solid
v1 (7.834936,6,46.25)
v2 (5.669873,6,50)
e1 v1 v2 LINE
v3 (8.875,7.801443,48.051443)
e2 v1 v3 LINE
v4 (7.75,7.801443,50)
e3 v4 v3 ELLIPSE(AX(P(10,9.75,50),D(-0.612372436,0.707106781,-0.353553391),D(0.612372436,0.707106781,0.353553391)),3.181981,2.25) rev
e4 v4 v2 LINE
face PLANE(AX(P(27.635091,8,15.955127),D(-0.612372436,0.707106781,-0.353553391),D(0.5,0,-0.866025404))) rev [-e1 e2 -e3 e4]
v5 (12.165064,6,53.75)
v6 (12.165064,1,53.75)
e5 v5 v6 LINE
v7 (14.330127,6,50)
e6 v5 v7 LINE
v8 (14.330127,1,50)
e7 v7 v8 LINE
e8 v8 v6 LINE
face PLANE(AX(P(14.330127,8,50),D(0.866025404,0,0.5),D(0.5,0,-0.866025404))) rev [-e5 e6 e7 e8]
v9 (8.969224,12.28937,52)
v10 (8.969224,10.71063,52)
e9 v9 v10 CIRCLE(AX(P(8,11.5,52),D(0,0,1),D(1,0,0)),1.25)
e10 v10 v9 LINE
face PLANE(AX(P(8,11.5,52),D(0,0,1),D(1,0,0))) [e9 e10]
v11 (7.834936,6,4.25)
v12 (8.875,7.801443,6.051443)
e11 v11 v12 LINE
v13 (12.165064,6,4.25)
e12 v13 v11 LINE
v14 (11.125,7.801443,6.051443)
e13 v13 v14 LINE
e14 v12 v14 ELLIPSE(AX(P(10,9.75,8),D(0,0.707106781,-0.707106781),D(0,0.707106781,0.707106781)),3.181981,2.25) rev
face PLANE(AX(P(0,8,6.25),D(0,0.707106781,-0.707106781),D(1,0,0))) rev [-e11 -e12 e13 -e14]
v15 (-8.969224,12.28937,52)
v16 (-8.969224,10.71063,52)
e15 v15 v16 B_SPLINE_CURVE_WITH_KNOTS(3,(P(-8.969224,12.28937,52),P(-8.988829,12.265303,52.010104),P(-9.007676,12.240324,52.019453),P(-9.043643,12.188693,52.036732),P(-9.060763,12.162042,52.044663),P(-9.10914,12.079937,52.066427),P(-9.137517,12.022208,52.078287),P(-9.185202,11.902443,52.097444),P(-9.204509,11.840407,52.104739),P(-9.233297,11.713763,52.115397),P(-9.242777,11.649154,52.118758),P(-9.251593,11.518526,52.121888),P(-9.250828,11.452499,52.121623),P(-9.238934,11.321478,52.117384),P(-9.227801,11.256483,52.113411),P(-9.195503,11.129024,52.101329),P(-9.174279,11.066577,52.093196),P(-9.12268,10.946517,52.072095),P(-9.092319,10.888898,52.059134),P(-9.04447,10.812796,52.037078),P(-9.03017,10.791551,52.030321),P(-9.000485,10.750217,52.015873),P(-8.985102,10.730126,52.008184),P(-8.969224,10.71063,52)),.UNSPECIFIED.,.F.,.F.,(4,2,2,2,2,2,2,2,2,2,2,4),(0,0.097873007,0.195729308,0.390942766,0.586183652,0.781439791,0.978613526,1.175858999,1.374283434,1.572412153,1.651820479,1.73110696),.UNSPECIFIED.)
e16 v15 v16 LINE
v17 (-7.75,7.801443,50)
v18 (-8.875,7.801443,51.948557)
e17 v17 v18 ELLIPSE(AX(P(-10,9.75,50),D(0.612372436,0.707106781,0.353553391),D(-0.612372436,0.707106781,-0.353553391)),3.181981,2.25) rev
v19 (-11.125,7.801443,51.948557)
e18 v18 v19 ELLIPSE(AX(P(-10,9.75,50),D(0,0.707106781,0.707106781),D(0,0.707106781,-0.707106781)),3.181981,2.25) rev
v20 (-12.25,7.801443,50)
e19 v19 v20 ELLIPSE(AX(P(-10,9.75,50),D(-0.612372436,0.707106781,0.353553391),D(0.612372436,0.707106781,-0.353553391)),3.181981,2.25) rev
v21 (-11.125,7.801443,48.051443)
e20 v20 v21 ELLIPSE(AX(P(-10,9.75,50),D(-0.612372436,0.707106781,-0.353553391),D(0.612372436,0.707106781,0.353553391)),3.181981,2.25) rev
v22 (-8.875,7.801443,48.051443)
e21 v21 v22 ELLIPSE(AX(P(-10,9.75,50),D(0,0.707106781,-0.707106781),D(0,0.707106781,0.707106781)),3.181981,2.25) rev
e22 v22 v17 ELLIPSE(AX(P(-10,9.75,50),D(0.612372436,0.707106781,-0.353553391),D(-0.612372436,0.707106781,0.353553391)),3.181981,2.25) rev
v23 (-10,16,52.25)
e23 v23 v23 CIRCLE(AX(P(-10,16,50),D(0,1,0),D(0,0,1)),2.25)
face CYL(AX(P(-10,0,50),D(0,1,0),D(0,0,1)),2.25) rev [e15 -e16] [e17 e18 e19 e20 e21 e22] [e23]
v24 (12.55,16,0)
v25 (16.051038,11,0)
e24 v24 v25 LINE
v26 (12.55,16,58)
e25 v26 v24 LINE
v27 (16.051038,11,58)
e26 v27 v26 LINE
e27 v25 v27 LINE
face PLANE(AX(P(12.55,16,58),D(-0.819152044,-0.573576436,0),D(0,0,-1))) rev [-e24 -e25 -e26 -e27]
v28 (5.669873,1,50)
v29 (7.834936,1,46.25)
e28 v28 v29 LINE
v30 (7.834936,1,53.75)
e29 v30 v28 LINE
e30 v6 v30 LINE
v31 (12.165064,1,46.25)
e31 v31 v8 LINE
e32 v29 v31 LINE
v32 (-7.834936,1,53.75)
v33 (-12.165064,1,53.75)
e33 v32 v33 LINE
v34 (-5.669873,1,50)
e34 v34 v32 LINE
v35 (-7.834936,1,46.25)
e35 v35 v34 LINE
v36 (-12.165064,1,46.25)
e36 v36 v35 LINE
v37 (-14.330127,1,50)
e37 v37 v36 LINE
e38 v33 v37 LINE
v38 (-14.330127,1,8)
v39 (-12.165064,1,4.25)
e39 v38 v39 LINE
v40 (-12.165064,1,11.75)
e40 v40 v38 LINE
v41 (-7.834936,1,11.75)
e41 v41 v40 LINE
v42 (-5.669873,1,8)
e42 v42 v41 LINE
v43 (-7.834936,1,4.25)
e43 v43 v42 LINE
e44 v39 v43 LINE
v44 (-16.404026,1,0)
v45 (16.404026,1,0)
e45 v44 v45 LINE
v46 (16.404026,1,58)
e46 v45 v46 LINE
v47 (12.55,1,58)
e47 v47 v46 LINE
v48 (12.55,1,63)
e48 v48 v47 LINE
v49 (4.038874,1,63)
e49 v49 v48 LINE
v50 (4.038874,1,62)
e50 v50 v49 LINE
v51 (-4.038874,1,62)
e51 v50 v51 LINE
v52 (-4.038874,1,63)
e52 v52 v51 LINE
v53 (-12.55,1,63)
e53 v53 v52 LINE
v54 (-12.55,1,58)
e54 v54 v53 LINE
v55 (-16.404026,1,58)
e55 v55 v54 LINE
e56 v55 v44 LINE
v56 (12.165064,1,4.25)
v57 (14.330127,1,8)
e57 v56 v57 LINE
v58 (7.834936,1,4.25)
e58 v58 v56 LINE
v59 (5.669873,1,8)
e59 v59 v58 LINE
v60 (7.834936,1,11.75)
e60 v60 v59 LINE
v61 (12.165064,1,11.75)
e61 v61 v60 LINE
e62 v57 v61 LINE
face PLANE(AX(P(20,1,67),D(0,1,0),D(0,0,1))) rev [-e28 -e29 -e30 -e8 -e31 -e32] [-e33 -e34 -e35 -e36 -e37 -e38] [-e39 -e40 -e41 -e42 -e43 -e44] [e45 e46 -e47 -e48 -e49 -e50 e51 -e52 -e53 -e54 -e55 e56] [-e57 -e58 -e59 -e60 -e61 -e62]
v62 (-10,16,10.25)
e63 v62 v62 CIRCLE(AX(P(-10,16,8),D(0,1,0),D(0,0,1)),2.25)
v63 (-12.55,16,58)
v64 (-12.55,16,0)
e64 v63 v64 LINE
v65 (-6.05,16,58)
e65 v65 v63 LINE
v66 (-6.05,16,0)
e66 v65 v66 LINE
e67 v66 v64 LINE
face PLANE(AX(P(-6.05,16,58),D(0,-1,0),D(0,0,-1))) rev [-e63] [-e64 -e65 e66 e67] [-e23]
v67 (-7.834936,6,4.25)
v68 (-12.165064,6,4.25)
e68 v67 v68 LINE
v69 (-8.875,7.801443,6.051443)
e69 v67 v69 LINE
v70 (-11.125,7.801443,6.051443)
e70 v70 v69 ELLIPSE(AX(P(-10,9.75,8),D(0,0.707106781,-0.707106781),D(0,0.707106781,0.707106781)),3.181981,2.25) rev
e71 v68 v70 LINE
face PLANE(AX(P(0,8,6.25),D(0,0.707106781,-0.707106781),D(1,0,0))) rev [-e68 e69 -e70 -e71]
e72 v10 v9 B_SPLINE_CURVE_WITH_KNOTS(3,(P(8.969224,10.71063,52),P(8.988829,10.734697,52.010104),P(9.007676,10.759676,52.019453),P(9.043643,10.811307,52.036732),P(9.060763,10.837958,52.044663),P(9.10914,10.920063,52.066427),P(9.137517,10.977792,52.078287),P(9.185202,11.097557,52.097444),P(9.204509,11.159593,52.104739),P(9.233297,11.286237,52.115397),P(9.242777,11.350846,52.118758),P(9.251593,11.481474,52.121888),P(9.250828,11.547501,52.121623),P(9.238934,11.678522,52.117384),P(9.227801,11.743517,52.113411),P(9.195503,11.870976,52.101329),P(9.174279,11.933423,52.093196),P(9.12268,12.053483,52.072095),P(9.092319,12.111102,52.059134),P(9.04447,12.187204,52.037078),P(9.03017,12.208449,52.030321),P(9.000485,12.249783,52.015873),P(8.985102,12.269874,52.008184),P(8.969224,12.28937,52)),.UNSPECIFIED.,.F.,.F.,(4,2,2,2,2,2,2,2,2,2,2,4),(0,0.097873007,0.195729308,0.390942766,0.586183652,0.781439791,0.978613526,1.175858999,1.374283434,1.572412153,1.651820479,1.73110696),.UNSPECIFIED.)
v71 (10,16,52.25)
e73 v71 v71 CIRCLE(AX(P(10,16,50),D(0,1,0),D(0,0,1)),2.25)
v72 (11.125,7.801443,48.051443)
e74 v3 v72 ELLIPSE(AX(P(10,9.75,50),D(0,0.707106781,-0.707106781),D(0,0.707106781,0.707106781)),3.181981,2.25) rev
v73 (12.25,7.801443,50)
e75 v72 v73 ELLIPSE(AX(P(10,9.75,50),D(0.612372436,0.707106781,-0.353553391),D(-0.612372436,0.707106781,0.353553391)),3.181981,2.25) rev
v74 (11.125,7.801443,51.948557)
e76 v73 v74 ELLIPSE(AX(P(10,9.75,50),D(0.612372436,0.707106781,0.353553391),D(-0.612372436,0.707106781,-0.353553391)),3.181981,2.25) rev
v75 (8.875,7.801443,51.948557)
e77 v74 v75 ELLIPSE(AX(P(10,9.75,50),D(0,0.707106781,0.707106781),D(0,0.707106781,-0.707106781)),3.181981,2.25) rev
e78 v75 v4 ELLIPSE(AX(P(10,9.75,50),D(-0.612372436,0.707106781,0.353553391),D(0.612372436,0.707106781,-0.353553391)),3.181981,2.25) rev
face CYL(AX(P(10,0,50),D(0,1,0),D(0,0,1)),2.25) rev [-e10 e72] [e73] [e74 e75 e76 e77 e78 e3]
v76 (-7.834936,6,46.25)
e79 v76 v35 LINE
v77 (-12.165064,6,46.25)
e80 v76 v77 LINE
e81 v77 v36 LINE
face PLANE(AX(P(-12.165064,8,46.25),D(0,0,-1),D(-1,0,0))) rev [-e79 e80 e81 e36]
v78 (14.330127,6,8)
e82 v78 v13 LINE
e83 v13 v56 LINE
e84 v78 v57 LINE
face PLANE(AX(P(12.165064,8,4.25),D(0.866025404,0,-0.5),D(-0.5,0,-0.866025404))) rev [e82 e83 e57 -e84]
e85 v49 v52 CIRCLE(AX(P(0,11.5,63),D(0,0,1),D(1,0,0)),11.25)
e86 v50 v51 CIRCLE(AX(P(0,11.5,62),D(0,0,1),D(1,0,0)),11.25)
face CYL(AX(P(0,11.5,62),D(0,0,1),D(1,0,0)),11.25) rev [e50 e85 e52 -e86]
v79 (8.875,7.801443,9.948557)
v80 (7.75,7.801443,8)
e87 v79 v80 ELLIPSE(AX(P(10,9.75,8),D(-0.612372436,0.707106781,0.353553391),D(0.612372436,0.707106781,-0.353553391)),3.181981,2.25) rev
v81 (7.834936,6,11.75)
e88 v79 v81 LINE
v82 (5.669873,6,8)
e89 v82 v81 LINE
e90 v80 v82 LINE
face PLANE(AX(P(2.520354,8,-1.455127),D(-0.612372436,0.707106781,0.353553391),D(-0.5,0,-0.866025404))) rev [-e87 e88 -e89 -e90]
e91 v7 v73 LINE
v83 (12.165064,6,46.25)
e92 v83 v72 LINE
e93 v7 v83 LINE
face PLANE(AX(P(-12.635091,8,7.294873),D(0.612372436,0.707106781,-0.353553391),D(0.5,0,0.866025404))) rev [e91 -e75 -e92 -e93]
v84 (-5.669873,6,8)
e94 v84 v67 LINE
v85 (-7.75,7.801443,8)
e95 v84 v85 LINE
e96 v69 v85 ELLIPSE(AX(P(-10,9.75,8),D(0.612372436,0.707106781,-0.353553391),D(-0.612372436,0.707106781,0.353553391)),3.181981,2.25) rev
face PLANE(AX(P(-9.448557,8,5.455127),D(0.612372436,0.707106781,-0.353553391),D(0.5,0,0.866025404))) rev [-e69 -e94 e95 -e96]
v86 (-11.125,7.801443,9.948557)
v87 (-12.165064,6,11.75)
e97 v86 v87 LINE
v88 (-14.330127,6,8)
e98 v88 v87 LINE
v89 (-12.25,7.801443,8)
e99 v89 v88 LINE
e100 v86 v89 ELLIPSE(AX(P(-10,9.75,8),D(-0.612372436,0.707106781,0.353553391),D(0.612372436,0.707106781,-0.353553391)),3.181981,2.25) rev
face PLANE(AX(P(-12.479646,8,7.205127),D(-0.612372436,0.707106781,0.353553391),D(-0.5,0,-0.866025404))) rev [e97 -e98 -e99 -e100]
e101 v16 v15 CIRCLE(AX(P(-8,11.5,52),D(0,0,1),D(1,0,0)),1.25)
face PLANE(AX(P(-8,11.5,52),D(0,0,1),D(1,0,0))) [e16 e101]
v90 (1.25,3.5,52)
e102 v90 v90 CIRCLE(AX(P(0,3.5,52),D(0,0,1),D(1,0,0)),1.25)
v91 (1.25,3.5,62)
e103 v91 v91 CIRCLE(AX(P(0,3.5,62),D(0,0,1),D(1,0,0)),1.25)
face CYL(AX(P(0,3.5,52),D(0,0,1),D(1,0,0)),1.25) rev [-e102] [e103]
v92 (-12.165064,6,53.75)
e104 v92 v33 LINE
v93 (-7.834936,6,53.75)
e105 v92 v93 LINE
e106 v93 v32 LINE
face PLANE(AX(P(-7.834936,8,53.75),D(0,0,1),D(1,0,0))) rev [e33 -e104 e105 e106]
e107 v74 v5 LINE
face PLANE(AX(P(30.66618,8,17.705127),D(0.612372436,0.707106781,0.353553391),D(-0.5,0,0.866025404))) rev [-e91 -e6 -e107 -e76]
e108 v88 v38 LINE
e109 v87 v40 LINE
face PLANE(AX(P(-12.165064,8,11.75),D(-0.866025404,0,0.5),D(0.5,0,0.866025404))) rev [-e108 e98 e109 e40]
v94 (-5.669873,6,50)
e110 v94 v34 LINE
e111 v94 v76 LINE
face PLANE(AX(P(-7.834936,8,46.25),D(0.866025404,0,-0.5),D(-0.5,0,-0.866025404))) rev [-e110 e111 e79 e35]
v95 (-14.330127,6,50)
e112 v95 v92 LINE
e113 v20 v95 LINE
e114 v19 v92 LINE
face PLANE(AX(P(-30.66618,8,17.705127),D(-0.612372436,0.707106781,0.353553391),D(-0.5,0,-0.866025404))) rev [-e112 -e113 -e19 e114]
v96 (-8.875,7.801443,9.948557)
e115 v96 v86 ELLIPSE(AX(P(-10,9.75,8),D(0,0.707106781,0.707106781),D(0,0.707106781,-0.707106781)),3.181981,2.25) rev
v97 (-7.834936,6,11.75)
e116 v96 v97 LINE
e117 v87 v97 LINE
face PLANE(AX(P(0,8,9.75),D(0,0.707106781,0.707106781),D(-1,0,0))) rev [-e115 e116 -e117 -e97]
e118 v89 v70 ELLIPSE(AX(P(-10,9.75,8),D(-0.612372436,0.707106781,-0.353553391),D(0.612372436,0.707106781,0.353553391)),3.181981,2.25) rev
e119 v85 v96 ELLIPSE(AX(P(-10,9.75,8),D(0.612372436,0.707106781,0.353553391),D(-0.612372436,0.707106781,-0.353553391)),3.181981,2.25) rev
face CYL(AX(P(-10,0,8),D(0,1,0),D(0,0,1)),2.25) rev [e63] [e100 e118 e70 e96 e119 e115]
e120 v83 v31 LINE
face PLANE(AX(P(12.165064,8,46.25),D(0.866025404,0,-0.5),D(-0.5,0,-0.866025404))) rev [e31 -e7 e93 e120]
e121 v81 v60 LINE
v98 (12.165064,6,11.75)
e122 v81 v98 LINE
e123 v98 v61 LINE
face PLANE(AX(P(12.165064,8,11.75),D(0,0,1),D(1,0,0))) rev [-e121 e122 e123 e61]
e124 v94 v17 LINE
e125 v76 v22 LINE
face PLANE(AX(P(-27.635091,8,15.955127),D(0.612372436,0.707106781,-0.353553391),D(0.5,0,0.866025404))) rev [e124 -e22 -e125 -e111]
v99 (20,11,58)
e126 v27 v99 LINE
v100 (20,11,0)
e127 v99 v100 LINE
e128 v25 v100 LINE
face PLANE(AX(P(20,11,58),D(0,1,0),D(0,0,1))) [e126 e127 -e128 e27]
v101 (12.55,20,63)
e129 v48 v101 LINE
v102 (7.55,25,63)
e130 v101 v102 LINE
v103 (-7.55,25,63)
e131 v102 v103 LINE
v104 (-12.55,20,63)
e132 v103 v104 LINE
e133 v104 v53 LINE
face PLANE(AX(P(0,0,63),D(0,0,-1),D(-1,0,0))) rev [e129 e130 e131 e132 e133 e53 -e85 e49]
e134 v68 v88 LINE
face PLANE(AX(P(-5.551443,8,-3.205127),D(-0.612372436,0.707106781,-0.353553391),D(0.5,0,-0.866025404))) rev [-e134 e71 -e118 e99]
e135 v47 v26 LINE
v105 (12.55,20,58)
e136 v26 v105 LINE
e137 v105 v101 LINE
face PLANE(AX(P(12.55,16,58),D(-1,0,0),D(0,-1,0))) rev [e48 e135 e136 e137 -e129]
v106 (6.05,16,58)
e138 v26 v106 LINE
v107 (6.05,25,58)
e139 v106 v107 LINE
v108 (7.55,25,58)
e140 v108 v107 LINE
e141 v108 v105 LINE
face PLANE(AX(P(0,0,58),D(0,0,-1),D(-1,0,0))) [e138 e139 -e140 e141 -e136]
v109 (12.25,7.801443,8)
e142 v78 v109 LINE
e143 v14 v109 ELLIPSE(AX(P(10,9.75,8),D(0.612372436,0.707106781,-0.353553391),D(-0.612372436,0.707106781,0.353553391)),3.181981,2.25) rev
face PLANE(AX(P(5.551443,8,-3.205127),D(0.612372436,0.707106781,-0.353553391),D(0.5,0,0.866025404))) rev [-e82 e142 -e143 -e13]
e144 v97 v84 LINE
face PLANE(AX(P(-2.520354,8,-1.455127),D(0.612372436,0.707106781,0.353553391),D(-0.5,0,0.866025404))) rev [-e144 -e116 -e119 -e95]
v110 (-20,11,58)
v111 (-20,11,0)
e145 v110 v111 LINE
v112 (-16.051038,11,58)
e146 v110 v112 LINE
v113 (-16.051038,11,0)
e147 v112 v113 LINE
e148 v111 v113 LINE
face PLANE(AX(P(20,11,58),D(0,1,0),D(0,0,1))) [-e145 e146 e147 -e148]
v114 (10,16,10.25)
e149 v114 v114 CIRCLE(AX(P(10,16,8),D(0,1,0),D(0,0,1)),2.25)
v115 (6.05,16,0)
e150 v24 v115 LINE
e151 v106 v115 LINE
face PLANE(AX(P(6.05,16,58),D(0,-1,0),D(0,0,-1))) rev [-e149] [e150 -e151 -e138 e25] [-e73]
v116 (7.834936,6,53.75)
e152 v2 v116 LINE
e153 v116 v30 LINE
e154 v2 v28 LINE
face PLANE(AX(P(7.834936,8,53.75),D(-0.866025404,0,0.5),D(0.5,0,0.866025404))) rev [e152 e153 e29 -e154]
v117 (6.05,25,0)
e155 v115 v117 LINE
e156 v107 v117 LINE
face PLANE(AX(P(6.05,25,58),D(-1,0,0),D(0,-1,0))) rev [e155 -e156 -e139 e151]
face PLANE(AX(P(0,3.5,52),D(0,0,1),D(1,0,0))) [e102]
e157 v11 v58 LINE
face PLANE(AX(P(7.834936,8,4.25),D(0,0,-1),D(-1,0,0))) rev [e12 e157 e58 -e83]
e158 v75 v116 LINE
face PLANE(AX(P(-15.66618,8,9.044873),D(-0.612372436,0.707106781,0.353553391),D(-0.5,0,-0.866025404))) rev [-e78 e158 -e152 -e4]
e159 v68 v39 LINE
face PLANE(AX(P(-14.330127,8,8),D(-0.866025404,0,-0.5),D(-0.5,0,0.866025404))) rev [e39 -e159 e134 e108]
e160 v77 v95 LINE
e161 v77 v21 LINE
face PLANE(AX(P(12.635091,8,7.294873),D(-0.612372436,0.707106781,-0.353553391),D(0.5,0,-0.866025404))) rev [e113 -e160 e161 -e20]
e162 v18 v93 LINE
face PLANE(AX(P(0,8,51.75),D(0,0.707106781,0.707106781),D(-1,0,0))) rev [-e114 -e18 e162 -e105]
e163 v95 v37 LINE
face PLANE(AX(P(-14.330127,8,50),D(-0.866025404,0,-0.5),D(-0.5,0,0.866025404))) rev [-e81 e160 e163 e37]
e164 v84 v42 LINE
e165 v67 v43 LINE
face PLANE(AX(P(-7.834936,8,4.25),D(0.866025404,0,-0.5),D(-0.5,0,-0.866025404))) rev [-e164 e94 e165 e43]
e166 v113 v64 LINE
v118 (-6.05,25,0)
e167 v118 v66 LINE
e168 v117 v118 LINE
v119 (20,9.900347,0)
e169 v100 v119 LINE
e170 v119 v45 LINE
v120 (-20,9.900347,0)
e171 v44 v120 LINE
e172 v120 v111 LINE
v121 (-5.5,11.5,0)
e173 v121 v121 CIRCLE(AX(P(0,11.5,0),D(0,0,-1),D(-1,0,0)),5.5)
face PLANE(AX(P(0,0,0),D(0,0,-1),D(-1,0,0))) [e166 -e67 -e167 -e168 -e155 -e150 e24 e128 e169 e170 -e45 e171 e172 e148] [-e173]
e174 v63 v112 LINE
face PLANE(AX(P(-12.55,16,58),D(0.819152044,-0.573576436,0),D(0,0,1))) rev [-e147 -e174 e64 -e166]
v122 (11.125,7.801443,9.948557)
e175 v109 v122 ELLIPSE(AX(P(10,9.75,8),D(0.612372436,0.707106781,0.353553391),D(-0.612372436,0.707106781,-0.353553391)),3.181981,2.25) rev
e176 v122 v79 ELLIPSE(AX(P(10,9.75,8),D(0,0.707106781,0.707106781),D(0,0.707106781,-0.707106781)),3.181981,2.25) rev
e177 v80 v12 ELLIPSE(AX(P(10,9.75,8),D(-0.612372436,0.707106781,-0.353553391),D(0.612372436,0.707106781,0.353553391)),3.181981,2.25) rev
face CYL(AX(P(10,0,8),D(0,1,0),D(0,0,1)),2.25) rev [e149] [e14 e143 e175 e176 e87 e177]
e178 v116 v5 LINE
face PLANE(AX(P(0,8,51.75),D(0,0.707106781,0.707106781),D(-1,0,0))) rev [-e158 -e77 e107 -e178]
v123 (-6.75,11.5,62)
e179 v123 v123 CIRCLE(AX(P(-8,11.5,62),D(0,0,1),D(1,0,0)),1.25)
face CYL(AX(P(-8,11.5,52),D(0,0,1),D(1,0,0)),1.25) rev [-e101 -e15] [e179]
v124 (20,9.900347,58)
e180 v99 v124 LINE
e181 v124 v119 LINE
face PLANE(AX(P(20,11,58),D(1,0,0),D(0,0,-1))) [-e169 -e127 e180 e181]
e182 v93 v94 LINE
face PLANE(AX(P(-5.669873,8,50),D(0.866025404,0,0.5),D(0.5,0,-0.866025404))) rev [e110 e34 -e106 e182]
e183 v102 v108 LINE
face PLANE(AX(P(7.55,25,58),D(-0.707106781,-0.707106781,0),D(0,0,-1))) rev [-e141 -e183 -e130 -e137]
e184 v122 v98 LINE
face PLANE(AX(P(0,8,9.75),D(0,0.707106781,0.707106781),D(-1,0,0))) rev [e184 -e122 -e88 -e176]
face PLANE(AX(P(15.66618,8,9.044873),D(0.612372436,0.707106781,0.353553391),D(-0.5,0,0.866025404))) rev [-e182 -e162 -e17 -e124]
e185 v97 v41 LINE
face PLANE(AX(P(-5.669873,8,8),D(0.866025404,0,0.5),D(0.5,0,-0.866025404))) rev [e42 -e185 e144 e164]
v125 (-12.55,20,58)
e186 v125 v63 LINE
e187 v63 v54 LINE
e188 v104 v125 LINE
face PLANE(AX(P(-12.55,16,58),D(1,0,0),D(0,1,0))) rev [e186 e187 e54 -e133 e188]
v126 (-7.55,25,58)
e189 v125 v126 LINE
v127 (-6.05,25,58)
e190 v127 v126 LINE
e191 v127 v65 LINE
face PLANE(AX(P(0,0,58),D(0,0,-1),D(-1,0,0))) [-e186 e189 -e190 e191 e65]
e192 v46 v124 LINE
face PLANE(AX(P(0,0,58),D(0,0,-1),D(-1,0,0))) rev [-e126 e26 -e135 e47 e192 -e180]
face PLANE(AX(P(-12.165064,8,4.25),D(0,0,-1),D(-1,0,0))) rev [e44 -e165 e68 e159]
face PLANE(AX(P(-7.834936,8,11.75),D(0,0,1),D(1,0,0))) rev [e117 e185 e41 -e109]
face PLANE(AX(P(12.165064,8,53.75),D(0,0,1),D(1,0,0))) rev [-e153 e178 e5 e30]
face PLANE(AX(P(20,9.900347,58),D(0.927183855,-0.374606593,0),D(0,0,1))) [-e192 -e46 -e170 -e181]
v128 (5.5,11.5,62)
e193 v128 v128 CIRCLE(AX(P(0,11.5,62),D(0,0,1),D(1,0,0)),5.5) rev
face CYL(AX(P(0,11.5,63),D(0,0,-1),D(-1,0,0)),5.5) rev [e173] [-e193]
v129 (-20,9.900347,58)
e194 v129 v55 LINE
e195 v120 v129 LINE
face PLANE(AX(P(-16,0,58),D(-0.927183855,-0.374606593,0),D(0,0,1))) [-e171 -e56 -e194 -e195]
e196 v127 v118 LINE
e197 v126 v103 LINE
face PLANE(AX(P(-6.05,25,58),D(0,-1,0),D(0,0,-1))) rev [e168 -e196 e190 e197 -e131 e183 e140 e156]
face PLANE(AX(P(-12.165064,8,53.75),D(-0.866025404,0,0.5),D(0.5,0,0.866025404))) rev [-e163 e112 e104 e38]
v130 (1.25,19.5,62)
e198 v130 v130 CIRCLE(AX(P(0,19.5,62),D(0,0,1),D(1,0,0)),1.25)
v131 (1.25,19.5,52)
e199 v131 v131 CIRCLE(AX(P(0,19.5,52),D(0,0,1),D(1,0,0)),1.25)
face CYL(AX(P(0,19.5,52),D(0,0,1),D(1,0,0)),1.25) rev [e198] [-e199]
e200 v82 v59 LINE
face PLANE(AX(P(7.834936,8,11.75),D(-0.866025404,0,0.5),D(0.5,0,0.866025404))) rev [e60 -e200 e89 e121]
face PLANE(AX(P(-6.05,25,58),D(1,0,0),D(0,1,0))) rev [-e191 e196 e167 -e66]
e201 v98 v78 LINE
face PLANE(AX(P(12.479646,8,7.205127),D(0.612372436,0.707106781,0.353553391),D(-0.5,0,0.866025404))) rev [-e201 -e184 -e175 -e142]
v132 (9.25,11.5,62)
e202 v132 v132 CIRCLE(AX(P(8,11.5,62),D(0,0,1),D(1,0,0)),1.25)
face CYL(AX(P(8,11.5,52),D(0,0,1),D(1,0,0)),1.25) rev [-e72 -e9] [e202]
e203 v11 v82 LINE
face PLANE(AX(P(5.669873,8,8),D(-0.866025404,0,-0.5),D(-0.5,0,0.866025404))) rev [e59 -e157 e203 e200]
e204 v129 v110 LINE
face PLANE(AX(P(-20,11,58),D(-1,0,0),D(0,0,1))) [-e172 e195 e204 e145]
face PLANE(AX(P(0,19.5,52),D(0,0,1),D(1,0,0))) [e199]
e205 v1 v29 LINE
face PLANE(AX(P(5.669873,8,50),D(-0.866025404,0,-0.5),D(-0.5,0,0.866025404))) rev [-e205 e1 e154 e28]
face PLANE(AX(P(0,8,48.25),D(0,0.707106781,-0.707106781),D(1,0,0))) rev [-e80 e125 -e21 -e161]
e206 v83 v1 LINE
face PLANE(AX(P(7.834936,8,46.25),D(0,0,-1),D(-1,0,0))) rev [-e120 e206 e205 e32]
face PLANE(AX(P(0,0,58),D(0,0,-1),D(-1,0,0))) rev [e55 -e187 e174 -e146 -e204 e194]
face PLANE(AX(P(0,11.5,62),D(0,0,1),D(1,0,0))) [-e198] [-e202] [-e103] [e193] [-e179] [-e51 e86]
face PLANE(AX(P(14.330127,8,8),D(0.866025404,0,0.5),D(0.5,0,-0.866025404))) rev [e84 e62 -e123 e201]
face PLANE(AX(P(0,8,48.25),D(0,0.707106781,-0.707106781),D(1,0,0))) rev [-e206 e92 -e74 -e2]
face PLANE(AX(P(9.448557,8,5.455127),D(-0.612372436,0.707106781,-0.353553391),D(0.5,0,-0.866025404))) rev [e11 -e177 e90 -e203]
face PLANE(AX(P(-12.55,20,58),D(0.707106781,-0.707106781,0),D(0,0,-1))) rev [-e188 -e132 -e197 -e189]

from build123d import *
from OCP.BRepFilletAPI import BRepFilletAPI_MakeChamfer

# Parameters (mm, degrees)
BOSS_EXTRUDE1_DEPTH = 58
SKETCH11_W          = 40
SKETCH11_H          = 11
BOSS_EXTRUDE3_DEPTH = 58
SKETCH5_W           = 25.1
SKETCH5_H           = 25
BOSS_EXTRUDE2_DEPTH = 5
SKETCH6_R           = 5.5
CUT_EXTRUDE4_DEPTH  = 63
SKETCH7_R           = 11.25
CUT_EXTRUDE5_DEPTH  = 1
SKETCH10_R          = 2.25
CUT_EXTRUDE7_DEPTH  = 16
CHAMFER2_SIZE       = 5
SKETCH9_R           = 1.25
CUT_EXTRUDE8_DEPTH  = 10
CUT_EXTRUDE9_DEPTH  = 8
CHAMFER4_SIZE       = 2
CHAMFER6_SIZE       = 5
CHAMFER6_SIZE_2     = 3.501037691
CHAMFER7_SIZE       = 4
CHAMFER7_SIZE2      = 9.900347414
CHAMFER8_SIZE       = 4
CHAMFER8_SIZE2      = 9.900347414
SKETCH13_W          = 40
SKETCH13_H          = 2
CUT_EXTRUDE10_DEPTH = 67


# Some blends are built 0.0001 mm under size
with BuildPart() as part:
    # Sketch1 → Boss-Extrude1 (new body)
    with BuildSketch(Plane.XY):
        Polygon((-6.05, 25), (6.05, 25), (6.05, 16), (12.55, 16), (12.55, 0), (-12.55, 0), (-12.55, 16), (-6.05, 16), align=None)
    extrude(amount=BOSS_EXTRUDE1_DEPTH)

    # Sketch11 → Boss-Extrude3 (add)
    with BuildSketch(Plane(origin=(0, 0, 0), x_dir=(-1, 0, 0), z_dir=(0, 0, -1))):
        with Locations((0, 5.5)):
            Rectangle(SKETCH11_W, SKETCH11_H)
    extrude(amount=-BOSS_EXTRUDE3_DEPTH)

    # Sketch5 → Boss-Extrude2 (add)
    with BuildSketch(Plane.XY.offset(58)):
        with Locations((0, 12.5)):
            Rectangle(SKETCH5_W, SKETCH5_H)
    extrude(amount=BOSS_EXTRUDE2_DEPTH)

    # Sketch6 → Cut-Extrude4 (cut)
    with BuildSketch(Plane(origin=(0, 0, 0), x_dir=(-1, 0, 0), z_dir=(0, 0, -1))):
        with Locations((0, 11.5)):
            Circle(SKETCH6_R)
    extrude(amount=-CUT_EXTRUDE4_DEPTH, mode=Mode.SUBTRACT)

    # Sketch7 → Cut-Extrude5 (cut)
    with BuildSketch(Plane.XY.offset(63)):
        with Locations((0, 11.5)):
            Circle(SKETCH7_R)
    extrude(amount=-CUT_EXTRUDE5_DEPTH, mode=Mode.SUBTRACT)

    # Sketch10 → Cut-Extrude7 (cut)
    with BuildSketch(Plane(origin=(0, 16, 0), x_dir=(1, 0, 0), z_dir=(0, 1, 0))):
        with Locations(Location((-10, -8, 0), (0, 0, 270))):
            Circle(SKETCH10_R)
        with Locations(Location((-10, -50, 0), (0, 0, 270))):
            Circle(SKETCH10_R)
        with Locations(Location((10, -50, 0), (0, 0, 270))):
            Circle(SKETCH10_R)
        with Locations(Location((10, -8, 0), (0, 0, 270))):
            Circle(SKETCH10_R)
    extrude(amount=-CUT_EXTRUDE7_DEPTH, mode=Mode.SUBTRACT)

    # Chamfer2
    chamfer2_edges = [part.edges().sort_by_distance(p)[0] for p in [
        (-12.55, 25, 60.5),
        (12.55, 25, 60.5),
    ]]
    chamfer(chamfer2_edges, length=CHAMFER2_SIZE)

    # Sketch9 → Cut-Extrude8 (cut)
    with BuildSketch(Plane.XY.offset(62)):
        with Locations((-8, 11.5)):
            Circle(SKETCH9_R)
        with Locations((8, 11.5)):
            Circle(SKETCH9_R)
        with Locations((0, 3.5)):
            Circle(SKETCH9_R)
        with Locations((0, 19.5)):
            Circle(SKETCH9_R)
    extrude(amount=-CUT_EXTRUDE8_DEPTH, mode=Mode.SUBTRACT)

    # Sketch12 → Cut-Extrude9 (cut)
    with BuildSketch(Plane.XZ):
        Polygon((12.165063509, 46.25), (14.330127019, 50), (12.165063509, 53.75), (7.834936491, 53.75), (5.669872981, 50), (7.834936491, 46.25), align=None)
        Polygon((-7.834936491, 46.25), (-5.669872981, 50), (-7.834936491, 53.75), (-12.165063509, 53.75), (-14.330127019, 50), (-12.165063509, 46.25), align=None)
        Polygon((-7.834936491, 4.25), (-5.669872981, 8), (-7.834936491, 11.75), (-12.165063509, 11.75), (-14.330127019, 8), (-12.165063509, 4.25), align=None)
        Polygon((12.165063509, 4.25), (14.330127019, 8), (12.165063509, 11.75), (7.834936491, 11.75), (5.669872981, 8), (7.834936491, 4.25), align=None)
    extrude(amount=-CUT_EXTRUDE9_DEPTH, mode=Mode.SUBTRACT)

    # Chamfer4
    # the kernel refuses this chamfer: 2 mm, written as the material it adds along each edge
    with BuildSketch(Plane(origin=(-16.901810007, 8, 12.454285596), x_dir=(-0.023812127644090745, -0.9996219169112968, -0.013747938305293514), z_dir=(0.49999999999999983, 0, -0.8660254037844388))) as chamfer4_piece_1_section:
        Polygon((CHAMFER4_SIZE * 0.999621916911, -CHAMFER4_SIZE * 0.0274958766106), (-CHAMFER4_SIZE * 0.0274958766106, -CHAMFER4_SIZE * 0.999621916911), (0, 0), align=None)
    chamfer4_piece_1 = extrude(amount=14.616858971, mode=Mode.PRIVATE)
    chamfer4_piece_1 = chamfer4_piece_1 - Plane(origin=(-10, 7.348778849, 8), x_dir=(0, 0, 1), z_dir=(0, 1, 0)) * Cylinder(2.25, 38, mode=Mode.PRIVATE)
    chamfer4_piece_1 = split(chamfer4_piece_1, bisect_by=Plane(origin=(-12.643492577, 7.348778849, 4.25), z_dir=(0, 0, 1)), keep=Keep.TOP, mode=Mode.PRIVATE)
    add(chamfer4_piece_1)
    with BuildSketch(Plane(origin=(-9.593380521, 8, 16.204285596), x_dir=(-0.02381212764408972, -0.9996219169112968, 0.013747938305292926), z_dir=(-0.49999999999999994, 0, -0.8660254037844387))) as chamfer4_piece_2_section:
        Polygon((CHAMFER4_SIZE * 0.999621916911, -CHAMFER4_SIZE * 0.0274958766106), (-CHAMFER4_SIZE * 0.0274958766106, -CHAMFER4_SIZE * 0.999621916911), (0, 0), align=None)
    chamfer4_piece_2 = extrude(amount=14.616858971, mode=Mode.PRIVATE)
    chamfer4_piece_2 = chamfer4_piece_2 - Plane(origin=(-10, 7.348778849, 8), x_dir=(0, 0, 1), z_dir=(0, 1, 0)) * Cylinder(2.25, 38, mode=Mode.PRIVATE)
    add(chamfer4_piece_2)
    with BuildSketch(Plane(origin=(-2.691570515, 8, 11.75), x_dir=(0, -0.9996219169112968, 0.027495876610586487), z_dir=(-1, 0, 0))) as chamfer4_piece_3_section:
        Polygon((CHAMFER4_SIZE * 0.999621916911, -CHAMFER4_SIZE * 0.0274958766106), (-CHAMFER4_SIZE * 0.0274958766106, -CHAMFER4_SIZE * 0.999621916911), (0, 0), align=None)
    chamfer4_piece_3 = extrude(amount=14.616858971, mode=Mode.PRIVATE)
    chamfer4_piece_3 = chamfer4_piece_3 - Plane(origin=(-10, 7.348778849, 8), x_dir=(0, 0, 1), z_dir=(0, 1, 0)) * Cylinder(2.25, 38, mode=Mode.PRIVATE)
    chamfer4_piece_3 = split(chamfer4_piece_3, bisect_by=Plane(origin=(-8.074151024, 7.348778849, 12.164331727), z_dir=(-0.8660254037844387, 0, -0.49999999999999994)), keep=Keep.TOP, mode=Mode.PRIVATE)
    add(chamfer4_piece_3)
    with BuildSketch(Plane(origin=(-3.098189993, 8, 3.545714404), x_dir=(0.023812127644090235, -0.9996219169112968, 0.01374793830529322), z_dir=(-0.49999999999999994, 0, 0.8660254037844387))) as chamfer4_piece_4_section:
        Polygon((CHAMFER4_SIZE * 0.999621916911, -CHAMFER4_SIZE * 0.0274958766106), (-CHAMFER4_SIZE * 0.0274958766106, -CHAMFER4_SIZE * 0.999621916911), (0, 0), align=None)
    chamfer4_piece_4 = extrude(amount=14.616858971, mode=Mode.PRIVATE)
    chamfer4_piece_4 = chamfer4_piece_4 - Plane(origin=(-10, 7.348778849, 8), x_dir=(0, 0, 1), z_dir=(0, 1, 0)) * Cylinder(2.25, 38, mode=Mode.PRIVATE)
    chamfer4_piece_4 = split(chamfer4_piece_4, bisect_by=Plane(origin=(-5.430658447, 7.348778849, 8.414331727), z_dir=(-0.8660254037844387, 0, 0.4999999999999999)), keep=Keep.TOP, mode=Mode.PRIVATE)
    add(chamfer4_piece_4)
    with BuildSketch(Plane(origin=(-10.406619479, 8, -0.204285596), x_dir=(0.023812127644089884, -0.9996219169112968, -0.013747938305293021), z_dir=(0.4999999999999999, 0, 0.8660254037844387))) as chamfer4_piece_5_section:
        Polygon((CHAMFER4_SIZE * 0.999621916911, -CHAMFER4_SIZE * 0.0274958766106), (-CHAMFER4_SIZE * 0.0274958766106, -CHAMFER4_SIZE * 0.999621916911), (0, 0), align=None)
    chamfer4_piece_5 = extrude(amount=14.616858971, mode=Mode.PRIVATE)
    chamfer4_piece_5 = chamfer4_piece_5 - Plane(origin=(-10, 7.348778849, 8), x_dir=(0, 0, 1), z_dir=(0, 1, 0)) * Cylinder(2.25, 38, mode=Mode.PRIVATE)
    chamfer4_piece_5 = split(chamfer4_piece_5, bisect_by=Plane(origin=(-5.430658447, 7.348778849, 7.585668273), z_dir=(-0.8660254037844387, 0, -0.49999999999999994)), keep=Keep.TOP, mode=Mode.PRIVATE)
    chamfer4_piece_5 = split(chamfer4_piece_5, bisect_by=Plane(origin=(-7.356507423, 7.348778849, 4.25), z_dir=(0, 0, 1)), keep=Keep.TOP, mode=Mode.PRIVATE)
    add(chamfer4_piece_5)
    with BuildSketch(Plane(origin=(-17.308429485, 8, 4.25), x_dir=(0, -0.9996219169112968, -0.027495876610586487), z_dir=(1, 0, 0))) as chamfer4_piece_6_section:
        Polygon((CHAMFER4_SIZE * 0.999621916911, -CHAMFER4_SIZE * 0.0274958766106), (-CHAMFER4_SIZE * 0.0274958766106, -CHAMFER4_SIZE * 0.999621916911), (0, 0), align=None)
    chamfer4_piece_6 = extrude(amount=14.616858971, mode=Mode.PRIVATE)
    chamfer4_piece_6 = chamfer4_piece_6 - Plane(origin=(-10, 7.348778849, 8), x_dir=(0, 0, 1), z_dir=(0, 1, 0)) * Cylinder(2.25, 38, mode=Mode.PRIVATE)
    chamfer4_piece_6 = split(chamfer4_piece_6, bisect_by=Plane(origin=(-8.074151024, 7.348778849, 3.835668273), z_dir=(-0.8660254037844387, 0, 0.4999999999999999)), keep=Keep.TOP, mode=Mode.PRIVATE)
    add(chamfer4_piece_6)
    with BuildSketch(Plane(origin=(3.098189993, 8, 12.454285596), x_dir=(-0.023812127644090207, -0.9996219169112968, -0.013747938305293207), z_dir=(0.49999999999999994, 0, -0.8660254037844387))) as chamfer4_piece_7_section:
        Polygon((CHAMFER4_SIZE * 0.999621916911, -CHAMFER4_SIZE * 0.0274958766106), (-CHAMFER4_SIZE * 0.0274958766106, -CHAMFER4_SIZE * 0.999621916911), (0, 0), align=None)
    chamfer4_piece_7 = extrude(amount=14.616858971, mode=Mode.PRIVATE)
    chamfer4_piece_7 = split(chamfer4_piece_7, bisect_by=Plane(origin=(5.430658447, 7.348778849, 7.585668273), z_dir=(0.8660254037844387, 0, -0.49999999999999994)), keep=Keep.TOP, mode=Mode.PRIVATE)
    chamfer4_piece_7 = split(chamfer4_piece_7, bisect_by=Plane(origin=(7.356507423, 7.348778849, 4.25), z_dir=(0, 0, 1)), keep=Keep.TOP, mode=Mode.PRIVATE)
    chamfer4_piece_7 = chamfer4_piece_7 - Plane(origin=(10, 7.348778849, 8), x_dir=(0, 0, 1), z_dir=(0, 1, 0)) * Cylinder(2.25, 38, mode=Mode.PRIVATE)
    add(chamfer4_piece_7)
    with BuildSketch(Plane(origin=(10.406619479, 8, 16.204285596), x_dir=(-0.023812127644090367, -0.9996219169112968, 0.0137479383052933), z_dir=(-0.49999999999999994, 0, -0.8660254037844387))) as chamfer4_piece_8_section:
        Polygon((CHAMFER4_SIZE * 0.999621916911, -CHAMFER4_SIZE * 0.0274958766106), (-CHAMFER4_SIZE * 0.0274958766106, -CHAMFER4_SIZE * 0.999621916911), (0, 0), align=None)
    chamfer4_piece_8 = extrude(amount=14.616858971, mode=Mode.PRIVATE)
    chamfer4_piece_8 = split(chamfer4_piece_8, bisect_by=Plane(origin=(5.430658447, 7.348778849, 8.414331727), z_dir=(0.8660254037844387, 0, 0.49999999999999994)), keep=Keep.TOP, mode=Mode.PRIVATE)
    chamfer4_piece_8 = chamfer4_piece_8 - Plane(origin=(10, 7.348778849, 8), x_dir=(0, 0, 1), z_dir=(0, 1, 0)) * Cylinder(2.25, 38, mode=Mode.PRIVATE)
    add(chamfer4_piece_8)
    with BuildSketch(Plane(origin=(17.308429485, 8, 11.75), x_dir=(0, -0.9996219169112968, 0.027495876610586487), z_dir=(-1, 0, 0))) as chamfer4_piece_9_section:
        Polygon((CHAMFER4_SIZE * 0.999621916911, -CHAMFER4_SIZE * 0.0274958766106), (-CHAMFER4_SIZE * 0.0274958766106, -CHAMFER4_SIZE * 0.999621916911), (0, 0), align=None)
    chamfer4_piece_9 = extrude(amount=14.616858971, mode=Mode.PRIVATE)
    chamfer4_piece_9 = split(chamfer4_piece_9, bisect_by=Plane(origin=(8.074151024, 7.348778849, 12.164331727), z_dir=(0.8660254037844387, 0, -0.49999999999999994)), keep=Keep.TOP, mode=Mode.PRIVATE)
    chamfer4_piece_9 = chamfer4_piece_9 - Plane(origin=(10, 7.348778849, 8), x_dir=(0, 0, 1), z_dir=(0, 1, 0)) * Cylinder(2.25, 38, mode=Mode.PRIVATE)
    add(chamfer4_piece_9)
    with BuildSketch(Plane(origin=(16.901810007, 8, 3.545714404), x_dir=(0.02381212764409056, -0.9996219169112968, 0.013747938305293401), z_dir=(-0.49999999999999967, 0, 0.8660254037844388))) as chamfer4_piece_10_section:
        Polygon((CHAMFER4_SIZE * 0.999621916911, -CHAMFER4_SIZE * 0.0274958766106), (-CHAMFER4_SIZE * 0.0274958766106, -CHAMFER4_SIZE * 0.999621916911), (0, 0), align=None)
    chamfer4_piece_10 = extrude(amount=14.616858971, mode=Mode.PRIVATE)
    chamfer4_piece_10 = chamfer4_piece_10 - Plane(origin=(10, 7.348778849, 8), x_dir=(0, 0, 1), z_dir=(0, 1, 0)) * Cylinder(2.25, 38, mode=Mode.PRIVATE)
    add(chamfer4_piece_10)
    with BuildSketch(Plane(origin=(9.593380521, 8, -0.204285596), x_dir=(0.02381212764408988, -0.9996219169112968, -0.01374793830529301), z_dir=(0.49999999999999967, 0, 0.8660254037844388))) as chamfer4_piece_11_section:
        Polygon((CHAMFER4_SIZE * 0.999621916911, -CHAMFER4_SIZE * 0.0274958766106), (-CHAMFER4_SIZE * 0.0274958766106, -CHAMFER4_SIZE * 0.999621916911), (0, 0), align=None)
    chamfer4_piece_11 = extrude(amount=14.616858971, mode=Mode.PRIVATE)
    chamfer4_piece_11 = split(chamfer4_piece_11, bisect_by=Plane(origin=(12.643492577, 7.348778849, 4.25), z_dir=(0, 0, 1)), keep=Keep.TOP, mode=Mode.PRIVATE)
    chamfer4_piece_11 = chamfer4_piece_11 - Plane(origin=(10, 7.348778849, 8), x_dir=(0, 0, 1), z_dir=(0, 1, 0)) * Cylinder(2.25, 38, mode=Mode.PRIVATE)
    add(chamfer4_piece_11)
    with BuildSketch(Plane(origin=(2.691570515, 8, 4.25), x_dir=(0, -0.9996219169112968, -0.027495876610586487), z_dir=(1, 0, 0))) as chamfer4_piece_12_section:
        Polygon((CHAMFER4_SIZE * 0.999621916911, -CHAMFER4_SIZE * 0.0274958766106), (-CHAMFER4_SIZE * 0.0274958766106, -CHAMFER4_SIZE * 0.999621916911), (0, 0), align=None)
    chamfer4_piece_12 = extrude(amount=14.616858971, mode=Mode.PRIVATE)
    chamfer4_piece_12 = split(chamfer4_piece_12, bisect_by=Plane(origin=(8.074151024, 7.348778849, 3.835668273), z_dir=(0.8660254037844387, 0, 0.49999999999999994)), keep=Keep.TOP, mode=Mode.PRIVATE)
    chamfer4_piece_12 = chamfer4_piece_12 - Plane(origin=(10, 7.348778849, 8), x_dir=(0, 0, 1), z_dir=(0, 1, 0)) * Cylinder(2.25, 38, mode=Mode.PRIVATE)
    add(chamfer4_piece_12)
    with BuildSketch(Plane(origin=(3.098189993, 8, 54.454285596), x_dir=(-0.02381212764409011, -0.9996219169112968, -0.013747938305293146), z_dir=(0.4999999999999998, 0, -0.8660254037844388))) as chamfer4_piece_13_section:
        Polygon((CHAMFER4_SIZE * 0.999621916911, -CHAMFER4_SIZE * 0.0274958766106), (-CHAMFER4_SIZE * 0.0274958766106, -CHAMFER4_SIZE * 0.999621916911), (0, 0), align=None)
    chamfer4_piece_13 = extrude(amount=14.616858971, mode=Mode.PRIVATE)
    chamfer4_piece_13 = split(chamfer4_piece_13, bisect_by=Plane(origin=(5.430658447, 7.348778849, 49.585668273), z_dir=(0.8660254037844388, 0, -0.49999999999999967)), keep=Keep.TOP, mode=Mode.PRIVATE)
    chamfer4_piece_13 = chamfer4_piece_13 - Plane(origin=(10, 7.348778849, 50), x_dir=(0, 0, 1), z_dir=(0, 1, 0)) * Cylinder(2.25, 38, mode=Mode.PRIVATE)
    add(chamfer4_piece_13)
    with BuildSketch(Plane(origin=(10.406619479, 8, 58.204285596), x_dir=(-0.023812127644089826, -0.9996219169112968, 0.013747938305292978), z_dir=(-0.4999999999999997, 0, -0.8660254037844389))) as chamfer4_piece_14_section:
        Polygon((CHAMFER4_SIZE * 0.999621916911, -CHAMFER4_SIZE * 0.0274958766106), (-CHAMFER4_SIZE * 0.0274958766106, -CHAMFER4_SIZE * 0.999621916911), (0, 0), align=None)
    chamfer4_piece_14 = extrude(amount=14.616858971, mode=Mode.PRIVATE)
    chamfer4_piece_14 = split(chamfer4_piece_14, bisect_by=Plane(origin=(5.430658447, 7.348778849, 50.414331727), z_dir=(0.8660254037844388, 0, 0.4999999999999998)), keep=Keep.TOP, mode=Mode.PRIVATE)
    chamfer4_piece_14 = chamfer4_piece_14 - Plane(origin=(10, 7.348778849, 50), x_dir=(0, 0, 1), z_dir=(0, 1, 0)) * Cylinder(2.25, 38, mode=Mode.PRIVATE)
    add(chamfer4_piece_14)
    with BuildSketch(Plane(origin=(17.308429485, 8, 53.75), x_dir=(0, -0.9996219169112968, 0.027495876610585623), z_dir=(-1, 0, 0))) as chamfer4_piece_15_section:
        Polygon((CHAMFER4_SIZE * 0.999621916911, -CHAMFER4_SIZE * 0.0274958766106), (-CHAMFER4_SIZE * 0.0274958766106, -CHAMFER4_SIZE * 0.999621916911), (0, 0), align=None)
    chamfer4_piece_15 = extrude(amount=14.616858971, mode=Mode.PRIVATE)
    chamfer4_piece_15 = split(chamfer4_piece_15, bisect_by=Plane(origin=(8.074151024, 7.348778849, 54.164331727), z_dir=(0.8660254037844388, 0, -0.49999999999999967)), keep=Keep.TOP, mode=Mode.PRIVATE)
    chamfer4_piece_15 = chamfer4_piece_15 - Plane(origin=(10, 7.348778849, 50), x_dir=(0, 0, 1), z_dir=(0, 1, 0)) * Cylinder(2.25, 38, mode=Mode.PRIVATE)
    add(chamfer4_piece_15)
    with BuildSketch(Plane(origin=(16.901810007, 8, 45.545714404), x_dir=(0.023812127644090925, -0.9996219169112968, 0.013747938305293602), z_dir=(-0.49999999999999944, 0, 0.866025403784439))) as chamfer4_piece_16_section:
        Polygon((CHAMFER4_SIZE * 0.999621916911, -CHAMFER4_SIZE * 0.0274958766106), (-CHAMFER4_SIZE * 0.0274958766106, -CHAMFER4_SIZE * 0.999621916911), (0, 0), align=None)
    chamfer4_piece_16 = extrude(amount=14.616858971, mode=Mode.PRIVATE)
    chamfer4_piece_16 = chamfer4_piece_16 - Plane(origin=(10, 7.348778849, 50), x_dir=(0, 0, 1), z_dir=(0, 1, 0)) * Cylinder(2.25, 38, mode=Mode.PRIVATE)
    add(chamfer4_piece_16)
    with BuildSketch(Plane(origin=(9.593380521, 8, 41.795714404), x_dir=(0.023812127644090273, -0.9996219169112968, -0.013747938305293236), z_dir=(0.49999999999999967, 0, 0.8660254037844388))) as chamfer4_piece_17_section:
        Polygon((CHAMFER4_SIZE * 0.999621916911, -CHAMFER4_SIZE * 0.0274958766106), (-CHAMFER4_SIZE * 0.0274958766106, -CHAMFER4_SIZE * 0.999621916911), (0, 0), align=None)
    chamfer4_piece_17 = extrude(amount=14.616858971, mode=Mode.PRIVATE)
    chamfer4_piece_17 = chamfer4_piece_17 - Plane(origin=(10, 7.348778849, 50), x_dir=(0, 0, 1), z_dir=(0, 1, 0)) * Cylinder(2.25, 38, mode=Mode.PRIVATE)
    add(chamfer4_piece_17)
    with BuildSketch(Plane(origin=(2.691570515, 8, 46.25), x_dir=(0, -0.9996219169112968, -0.027495876610585623), z_dir=(1, 0, 0))) as chamfer4_piece_18_section:
        Polygon((CHAMFER4_SIZE * 0.999621916911, -CHAMFER4_SIZE * 0.0274958766106), (-CHAMFER4_SIZE * 0.0274958766106, -CHAMFER4_SIZE * 0.999621916911), (0, 0), align=None)
    chamfer4_piece_18 = extrude(amount=14.616858971, mode=Mode.PRIVATE)
    chamfer4_piece_18 = split(chamfer4_piece_18, bisect_by=Plane(origin=(8.074151024, 7.348778849, 45.835668273), z_dir=(0.8660254037844388, 0, 0.4999999999999998)), keep=Keep.TOP, mode=Mode.PRIVATE)
    chamfer4_piece_18 = chamfer4_piece_18 - Plane(origin=(10, 7.348778849, 50), x_dir=(0, 0, 1), z_dir=(0, 1, 0)) * Cylinder(2.25, 38, mode=Mode.PRIVATE)
    add(chamfer4_piece_18)
    with BuildSketch(Plane(origin=(-16.901810007, 8, 54.454285596), x_dir=(-0.023812127644091113, -0.9996219169112968, -0.013747938305293738), z_dir=(0.5000000000000001, 0, -0.8660254037844387))) as chamfer4_piece_19_section:
        Polygon((CHAMFER4_SIZE * 0.999621916911, -CHAMFER4_SIZE * 0.0274958766106), (-CHAMFER4_SIZE * 0.0274958766106, -CHAMFER4_SIZE * 0.999621916911), (0, 0), align=None)
    chamfer4_piece_19 = extrude(amount=14.616858971, mode=Mode.PRIVATE)
    chamfer4_piece_19 = chamfer4_piece_19 - Plane(origin=(-10, 7.348778849, 50), x_dir=(0, 0, 1), z_dir=(0, 1, 0)) * Cylinder(2.25, 38, mode=Mode.PRIVATE)
    add(chamfer4_piece_19)
    with BuildSketch(Plane(origin=(-9.593380521, 8, 58.204285596), x_dir=(-0.023812127644089826, -0.9996219169112968, 0.013747938305292976), z_dir=(-0.4999999999999996, 0, -0.8660254037844389))) as chamfer4_piece_20_section:
        Polygon((CHAMFER4_SIZE * 0.999621916911, -CHAMFER4_SIZE * 0.0274958766106), (-CHAMFER4_SIZE * 0.0274958766106, -CHAMFER4_SIZE * 0.999621916911), (0, 0), align=None)
    chamfer4_piece_20 = extrude(amount=14.616858971, mode=Mode.PRIVATE)
    chamfer4_piece_20 = chamfer4_piece_20 - Plane(origin=(-10, 7.348778849, 50), x_dir=(0, 0, 1), z_dir=(0, 1, 0)) * Cylinder(2.25, 38, mode=Mode.PRIVATE)
    add(chamfer4_piece_20)
    with BuildSketch(Plane(origin=(-2.691570515, 8, 53.75), x_dir=(0, -0.9996219169112968, 0.027495876610585623), z_dir=(-1, 0, 0))) as chamfer4_piece_21_section:
        Polygon((CHAMFER4_SIZE * 0.999621916911, -CHAMFER4_SIZE * 0.0274958766106), (-CHAMFER4_SIZE * 0.0274958766106, -CHAMFER4_SIZE * 0.999621916911), (0, 0), align=None)
    chamfer4_piece_21 = extrude(amount=14.616858971, mode=Mode.PRIVATE)
    chamfer4_piece_21 = chamfer4_piece_21 - Plane(origin=(-10, 7.348778849, 50), x_dir=(0, 0, 1), z_dir=(0, 1, 0)) * Cylinder(2.25, 38, mode=Mode.PRIVATE)
    chamfer4_piece_21 = split(chamfer4_piece_21, bisect_by=Plane(origin=(-8.074151024, 7.348778849, 54.164331727), z_dir=(-0.866025403784439, 0, -0.49999999999999944)), keep=Keep.TOP, mode=Mode.PRIVATE)
    add(chamfer4_piece_21)
    with BuildSketch(Plane(origin=(-3.098189993, 8, 45.545714404), x_dir=(0.023812127644091286, -0.9996219169112968, 0.01374793830529381), z_dir=(-0.49999999999999944, 0, 0.866025403784439))) as chamfer4_piece_22_section:
        Polygon((CHAMFER4_SIZE * 0.999621916911, -CHAMFER4_SIZE * 0.0274958766106), (-CHAMFER4_SIZE * 0.0274958766106, -CHAMFER4_SIZE * 0.999621916911), (0, 0), align=None)
    chamfer4_piece_22 = extrude(amount=14.616858971, mode=Mode.PRIVATE)
    chamfer4_piece_22 = chamfer4_piece_22 - Plane(origin=(-10, 7.348778849, 50), x_dir=(0, 0, 1), z_dir=(0, 1, 0)) * Cylinder(2.25, 38, mode=Mode.PRIVATE)
    chamfer4_piece_22 = split(chamfer4_piece_22, bisect_by=Plane(origin=(-5.430658447, 7.348778849, 50.414331727), z_dir=(-0.8660254037844384, 0, 0.5000000000000006)), keep=Keep.TOP, mode=Mode.PRIVATE)
    add(chamfer4_piece_22)
    with BuildSketch(Plane(origin=(-10.406619479, 8, 41.795714404), x_dir=(0.02381212764408981, -0.9996219169112968, -0.013747938305293002), z_dir=(0.5000000000000006, 0, 0.8660254037844384))) as chamfer4_piece_23_section:
        Polygon((CHAMFER4_SIZE * 0.999621916911, -CHAMFER4_SIZE * 0.0274958766106), (-CHAMFER4_SIZE * 0.0274958766106, -CHAMFER4_SIZE * 0.999621916911), (0, 0), align=None)
    chamfer4_piece_23 = extrude(amount=14.616858971, mode=Mode.PRIVATE)
    chamfer4_piece_23 = chamfer4_piece_23 - Plane(origin=(-10, 7.348778849, 50), x_dir=(0, 0, 1), z_dir=(0, 1, 0)) * Cylinder(2.25, 38, mode=Mode.PRIVATE)
    chamfer4_piece_23 = split(chamfer4_piece_23, bisect_by=Plane(origin=(-5.430658447, 7.348778849, 49.585668273), z_dir=(-0.866025403784439, 0, -0.49999999999999944)), keep=Keep.TOP, mode=Mode.PRIVATE)
    add(chamfer4_piece_23)
    with BuildSketch(Plane(origin=(-17.308429485, 8, 46.25), x_dir=(0, -0.9996219169112968, -0.027495876610585623), z_dir=(1, 0, 0))) as chamfer4_piece_24_section:
        Polygon((CHAMFER4_SIZE * 0.999621916911, -CHAMFER4_SIZE * 0.0274958766106), (-CHAMFER4_SIZE * 0.0274958766106, -CHAMFER4_SIZE * 0.999621916911), (0, 0), align=None)
    chamfer4_piece_24 = extrude(amount=14.616858971, mode=Mode.PRIVATE)
    chamfer4_piece_24 = chamfer4_piece_24 - Plane(origin=(-10, 7.348778849, 50), x_dir=(0, 0, 1), z_dir=(0, 1, 0)) * Cylinder(2.25, 38, mode=Mode.PRIVATE)
    chamfer4_piece_24 = split(chamfer4_piece_24, bisect_by=Plane(origin=(-8.074151024, 7.348778849, 45.835668273), z_dir=(-0.8660254037844384, 0, 0.5000000000000006)), keep=Keep.TOP, mode=Mode.PRIVATE)
    add(chamfer4_piece_24)

    # Chamfer6
    chamfer6_edges_1 = [part.edges().sort_by_distance(p)[0] for p in [
        (-12.55, 11, 29),
    ]]
    chamfer6_side_1 = [part.faces().sort_by_distance(p)[0] for p in [
        (-12.55, 11.070020754, 29),
    ]]
    chamfer6_edges_2 = [part.edges().sort_by_distance(p)[0] for p in [
        (12.55, 11, 29),
    ]]
    chamfer6_side_2 = [part.faces().sort_by_distance(p)[0] for p in [
        (12.55, 11.070020754, 29),
    ]]
    chamfer6 = BRepFilletAPI_MakeChamfer(part.part.solid().wrapped)
    for e in chamfer6_edges_1:
        chamfer6.Add(CHAMFER6_SIZE - 0.0001, CHAMFER6_SIZE_2 - 0.0001, e.wrapped, chamfer6_side_1[0].wrapped)
    for e in chamfer6_edges_2:
        chamfer6.Add(CHAMFER6_SIZE - 0.0001, CHAMFER6_SIZE_2 - 0.0001, e.wrapped, chamfer6_side_2[0].wrapped)
    add(Compound.cast(chamfer6.Shape()), mode=Mode.REPLACE)  # a hair under: the kernel refuses the full size

    # Chamfer7
    chamfer7_edges = [part.edges().sort_by_distance(p)[0] for p in [
        (-20, 0, 29),
    ]]
    chamfer7_side = [part.faces().sort_by_distance(p)[0] for p in [
        (0, 0, 30.75649703),
    ]]
    chamfer(chamfer7_edges, length=CHAMFER7_SIZE, length2=CHAMFER7_SIZE2, reference=chamfer7_side[0])

    # Chamfer8
    chamfer8_edges = [part.edges().sort_by_distance(p)[0] for p in [
        (20, 0, 29),
    ]]
    chamfer8_side = [part.faces().sort_by_distance(p)[0] for p in [
        (2.068715144, 0, 30.958368808),
    ]]
    chamfer(chamfer8_edges, length=CHAMFER8_SIZE, length2=CHAMFER8_SIZE2, reference=chamfer8_side[0])

    # Sketch13 → Cut-Extrude10 (cut)
    with BuildSketch(Plane(origin=(0, 0, 0), x_dir=(-1, 0, 0), z_dir=(0, 0, -1))):
        Rectangle(SKETCH13_W, SKETCH13_H)
    extrude(amount=-CUT_EXTRUDE10_DEPTH, mode=Mode.SUBTRACT)


solid = part.part
